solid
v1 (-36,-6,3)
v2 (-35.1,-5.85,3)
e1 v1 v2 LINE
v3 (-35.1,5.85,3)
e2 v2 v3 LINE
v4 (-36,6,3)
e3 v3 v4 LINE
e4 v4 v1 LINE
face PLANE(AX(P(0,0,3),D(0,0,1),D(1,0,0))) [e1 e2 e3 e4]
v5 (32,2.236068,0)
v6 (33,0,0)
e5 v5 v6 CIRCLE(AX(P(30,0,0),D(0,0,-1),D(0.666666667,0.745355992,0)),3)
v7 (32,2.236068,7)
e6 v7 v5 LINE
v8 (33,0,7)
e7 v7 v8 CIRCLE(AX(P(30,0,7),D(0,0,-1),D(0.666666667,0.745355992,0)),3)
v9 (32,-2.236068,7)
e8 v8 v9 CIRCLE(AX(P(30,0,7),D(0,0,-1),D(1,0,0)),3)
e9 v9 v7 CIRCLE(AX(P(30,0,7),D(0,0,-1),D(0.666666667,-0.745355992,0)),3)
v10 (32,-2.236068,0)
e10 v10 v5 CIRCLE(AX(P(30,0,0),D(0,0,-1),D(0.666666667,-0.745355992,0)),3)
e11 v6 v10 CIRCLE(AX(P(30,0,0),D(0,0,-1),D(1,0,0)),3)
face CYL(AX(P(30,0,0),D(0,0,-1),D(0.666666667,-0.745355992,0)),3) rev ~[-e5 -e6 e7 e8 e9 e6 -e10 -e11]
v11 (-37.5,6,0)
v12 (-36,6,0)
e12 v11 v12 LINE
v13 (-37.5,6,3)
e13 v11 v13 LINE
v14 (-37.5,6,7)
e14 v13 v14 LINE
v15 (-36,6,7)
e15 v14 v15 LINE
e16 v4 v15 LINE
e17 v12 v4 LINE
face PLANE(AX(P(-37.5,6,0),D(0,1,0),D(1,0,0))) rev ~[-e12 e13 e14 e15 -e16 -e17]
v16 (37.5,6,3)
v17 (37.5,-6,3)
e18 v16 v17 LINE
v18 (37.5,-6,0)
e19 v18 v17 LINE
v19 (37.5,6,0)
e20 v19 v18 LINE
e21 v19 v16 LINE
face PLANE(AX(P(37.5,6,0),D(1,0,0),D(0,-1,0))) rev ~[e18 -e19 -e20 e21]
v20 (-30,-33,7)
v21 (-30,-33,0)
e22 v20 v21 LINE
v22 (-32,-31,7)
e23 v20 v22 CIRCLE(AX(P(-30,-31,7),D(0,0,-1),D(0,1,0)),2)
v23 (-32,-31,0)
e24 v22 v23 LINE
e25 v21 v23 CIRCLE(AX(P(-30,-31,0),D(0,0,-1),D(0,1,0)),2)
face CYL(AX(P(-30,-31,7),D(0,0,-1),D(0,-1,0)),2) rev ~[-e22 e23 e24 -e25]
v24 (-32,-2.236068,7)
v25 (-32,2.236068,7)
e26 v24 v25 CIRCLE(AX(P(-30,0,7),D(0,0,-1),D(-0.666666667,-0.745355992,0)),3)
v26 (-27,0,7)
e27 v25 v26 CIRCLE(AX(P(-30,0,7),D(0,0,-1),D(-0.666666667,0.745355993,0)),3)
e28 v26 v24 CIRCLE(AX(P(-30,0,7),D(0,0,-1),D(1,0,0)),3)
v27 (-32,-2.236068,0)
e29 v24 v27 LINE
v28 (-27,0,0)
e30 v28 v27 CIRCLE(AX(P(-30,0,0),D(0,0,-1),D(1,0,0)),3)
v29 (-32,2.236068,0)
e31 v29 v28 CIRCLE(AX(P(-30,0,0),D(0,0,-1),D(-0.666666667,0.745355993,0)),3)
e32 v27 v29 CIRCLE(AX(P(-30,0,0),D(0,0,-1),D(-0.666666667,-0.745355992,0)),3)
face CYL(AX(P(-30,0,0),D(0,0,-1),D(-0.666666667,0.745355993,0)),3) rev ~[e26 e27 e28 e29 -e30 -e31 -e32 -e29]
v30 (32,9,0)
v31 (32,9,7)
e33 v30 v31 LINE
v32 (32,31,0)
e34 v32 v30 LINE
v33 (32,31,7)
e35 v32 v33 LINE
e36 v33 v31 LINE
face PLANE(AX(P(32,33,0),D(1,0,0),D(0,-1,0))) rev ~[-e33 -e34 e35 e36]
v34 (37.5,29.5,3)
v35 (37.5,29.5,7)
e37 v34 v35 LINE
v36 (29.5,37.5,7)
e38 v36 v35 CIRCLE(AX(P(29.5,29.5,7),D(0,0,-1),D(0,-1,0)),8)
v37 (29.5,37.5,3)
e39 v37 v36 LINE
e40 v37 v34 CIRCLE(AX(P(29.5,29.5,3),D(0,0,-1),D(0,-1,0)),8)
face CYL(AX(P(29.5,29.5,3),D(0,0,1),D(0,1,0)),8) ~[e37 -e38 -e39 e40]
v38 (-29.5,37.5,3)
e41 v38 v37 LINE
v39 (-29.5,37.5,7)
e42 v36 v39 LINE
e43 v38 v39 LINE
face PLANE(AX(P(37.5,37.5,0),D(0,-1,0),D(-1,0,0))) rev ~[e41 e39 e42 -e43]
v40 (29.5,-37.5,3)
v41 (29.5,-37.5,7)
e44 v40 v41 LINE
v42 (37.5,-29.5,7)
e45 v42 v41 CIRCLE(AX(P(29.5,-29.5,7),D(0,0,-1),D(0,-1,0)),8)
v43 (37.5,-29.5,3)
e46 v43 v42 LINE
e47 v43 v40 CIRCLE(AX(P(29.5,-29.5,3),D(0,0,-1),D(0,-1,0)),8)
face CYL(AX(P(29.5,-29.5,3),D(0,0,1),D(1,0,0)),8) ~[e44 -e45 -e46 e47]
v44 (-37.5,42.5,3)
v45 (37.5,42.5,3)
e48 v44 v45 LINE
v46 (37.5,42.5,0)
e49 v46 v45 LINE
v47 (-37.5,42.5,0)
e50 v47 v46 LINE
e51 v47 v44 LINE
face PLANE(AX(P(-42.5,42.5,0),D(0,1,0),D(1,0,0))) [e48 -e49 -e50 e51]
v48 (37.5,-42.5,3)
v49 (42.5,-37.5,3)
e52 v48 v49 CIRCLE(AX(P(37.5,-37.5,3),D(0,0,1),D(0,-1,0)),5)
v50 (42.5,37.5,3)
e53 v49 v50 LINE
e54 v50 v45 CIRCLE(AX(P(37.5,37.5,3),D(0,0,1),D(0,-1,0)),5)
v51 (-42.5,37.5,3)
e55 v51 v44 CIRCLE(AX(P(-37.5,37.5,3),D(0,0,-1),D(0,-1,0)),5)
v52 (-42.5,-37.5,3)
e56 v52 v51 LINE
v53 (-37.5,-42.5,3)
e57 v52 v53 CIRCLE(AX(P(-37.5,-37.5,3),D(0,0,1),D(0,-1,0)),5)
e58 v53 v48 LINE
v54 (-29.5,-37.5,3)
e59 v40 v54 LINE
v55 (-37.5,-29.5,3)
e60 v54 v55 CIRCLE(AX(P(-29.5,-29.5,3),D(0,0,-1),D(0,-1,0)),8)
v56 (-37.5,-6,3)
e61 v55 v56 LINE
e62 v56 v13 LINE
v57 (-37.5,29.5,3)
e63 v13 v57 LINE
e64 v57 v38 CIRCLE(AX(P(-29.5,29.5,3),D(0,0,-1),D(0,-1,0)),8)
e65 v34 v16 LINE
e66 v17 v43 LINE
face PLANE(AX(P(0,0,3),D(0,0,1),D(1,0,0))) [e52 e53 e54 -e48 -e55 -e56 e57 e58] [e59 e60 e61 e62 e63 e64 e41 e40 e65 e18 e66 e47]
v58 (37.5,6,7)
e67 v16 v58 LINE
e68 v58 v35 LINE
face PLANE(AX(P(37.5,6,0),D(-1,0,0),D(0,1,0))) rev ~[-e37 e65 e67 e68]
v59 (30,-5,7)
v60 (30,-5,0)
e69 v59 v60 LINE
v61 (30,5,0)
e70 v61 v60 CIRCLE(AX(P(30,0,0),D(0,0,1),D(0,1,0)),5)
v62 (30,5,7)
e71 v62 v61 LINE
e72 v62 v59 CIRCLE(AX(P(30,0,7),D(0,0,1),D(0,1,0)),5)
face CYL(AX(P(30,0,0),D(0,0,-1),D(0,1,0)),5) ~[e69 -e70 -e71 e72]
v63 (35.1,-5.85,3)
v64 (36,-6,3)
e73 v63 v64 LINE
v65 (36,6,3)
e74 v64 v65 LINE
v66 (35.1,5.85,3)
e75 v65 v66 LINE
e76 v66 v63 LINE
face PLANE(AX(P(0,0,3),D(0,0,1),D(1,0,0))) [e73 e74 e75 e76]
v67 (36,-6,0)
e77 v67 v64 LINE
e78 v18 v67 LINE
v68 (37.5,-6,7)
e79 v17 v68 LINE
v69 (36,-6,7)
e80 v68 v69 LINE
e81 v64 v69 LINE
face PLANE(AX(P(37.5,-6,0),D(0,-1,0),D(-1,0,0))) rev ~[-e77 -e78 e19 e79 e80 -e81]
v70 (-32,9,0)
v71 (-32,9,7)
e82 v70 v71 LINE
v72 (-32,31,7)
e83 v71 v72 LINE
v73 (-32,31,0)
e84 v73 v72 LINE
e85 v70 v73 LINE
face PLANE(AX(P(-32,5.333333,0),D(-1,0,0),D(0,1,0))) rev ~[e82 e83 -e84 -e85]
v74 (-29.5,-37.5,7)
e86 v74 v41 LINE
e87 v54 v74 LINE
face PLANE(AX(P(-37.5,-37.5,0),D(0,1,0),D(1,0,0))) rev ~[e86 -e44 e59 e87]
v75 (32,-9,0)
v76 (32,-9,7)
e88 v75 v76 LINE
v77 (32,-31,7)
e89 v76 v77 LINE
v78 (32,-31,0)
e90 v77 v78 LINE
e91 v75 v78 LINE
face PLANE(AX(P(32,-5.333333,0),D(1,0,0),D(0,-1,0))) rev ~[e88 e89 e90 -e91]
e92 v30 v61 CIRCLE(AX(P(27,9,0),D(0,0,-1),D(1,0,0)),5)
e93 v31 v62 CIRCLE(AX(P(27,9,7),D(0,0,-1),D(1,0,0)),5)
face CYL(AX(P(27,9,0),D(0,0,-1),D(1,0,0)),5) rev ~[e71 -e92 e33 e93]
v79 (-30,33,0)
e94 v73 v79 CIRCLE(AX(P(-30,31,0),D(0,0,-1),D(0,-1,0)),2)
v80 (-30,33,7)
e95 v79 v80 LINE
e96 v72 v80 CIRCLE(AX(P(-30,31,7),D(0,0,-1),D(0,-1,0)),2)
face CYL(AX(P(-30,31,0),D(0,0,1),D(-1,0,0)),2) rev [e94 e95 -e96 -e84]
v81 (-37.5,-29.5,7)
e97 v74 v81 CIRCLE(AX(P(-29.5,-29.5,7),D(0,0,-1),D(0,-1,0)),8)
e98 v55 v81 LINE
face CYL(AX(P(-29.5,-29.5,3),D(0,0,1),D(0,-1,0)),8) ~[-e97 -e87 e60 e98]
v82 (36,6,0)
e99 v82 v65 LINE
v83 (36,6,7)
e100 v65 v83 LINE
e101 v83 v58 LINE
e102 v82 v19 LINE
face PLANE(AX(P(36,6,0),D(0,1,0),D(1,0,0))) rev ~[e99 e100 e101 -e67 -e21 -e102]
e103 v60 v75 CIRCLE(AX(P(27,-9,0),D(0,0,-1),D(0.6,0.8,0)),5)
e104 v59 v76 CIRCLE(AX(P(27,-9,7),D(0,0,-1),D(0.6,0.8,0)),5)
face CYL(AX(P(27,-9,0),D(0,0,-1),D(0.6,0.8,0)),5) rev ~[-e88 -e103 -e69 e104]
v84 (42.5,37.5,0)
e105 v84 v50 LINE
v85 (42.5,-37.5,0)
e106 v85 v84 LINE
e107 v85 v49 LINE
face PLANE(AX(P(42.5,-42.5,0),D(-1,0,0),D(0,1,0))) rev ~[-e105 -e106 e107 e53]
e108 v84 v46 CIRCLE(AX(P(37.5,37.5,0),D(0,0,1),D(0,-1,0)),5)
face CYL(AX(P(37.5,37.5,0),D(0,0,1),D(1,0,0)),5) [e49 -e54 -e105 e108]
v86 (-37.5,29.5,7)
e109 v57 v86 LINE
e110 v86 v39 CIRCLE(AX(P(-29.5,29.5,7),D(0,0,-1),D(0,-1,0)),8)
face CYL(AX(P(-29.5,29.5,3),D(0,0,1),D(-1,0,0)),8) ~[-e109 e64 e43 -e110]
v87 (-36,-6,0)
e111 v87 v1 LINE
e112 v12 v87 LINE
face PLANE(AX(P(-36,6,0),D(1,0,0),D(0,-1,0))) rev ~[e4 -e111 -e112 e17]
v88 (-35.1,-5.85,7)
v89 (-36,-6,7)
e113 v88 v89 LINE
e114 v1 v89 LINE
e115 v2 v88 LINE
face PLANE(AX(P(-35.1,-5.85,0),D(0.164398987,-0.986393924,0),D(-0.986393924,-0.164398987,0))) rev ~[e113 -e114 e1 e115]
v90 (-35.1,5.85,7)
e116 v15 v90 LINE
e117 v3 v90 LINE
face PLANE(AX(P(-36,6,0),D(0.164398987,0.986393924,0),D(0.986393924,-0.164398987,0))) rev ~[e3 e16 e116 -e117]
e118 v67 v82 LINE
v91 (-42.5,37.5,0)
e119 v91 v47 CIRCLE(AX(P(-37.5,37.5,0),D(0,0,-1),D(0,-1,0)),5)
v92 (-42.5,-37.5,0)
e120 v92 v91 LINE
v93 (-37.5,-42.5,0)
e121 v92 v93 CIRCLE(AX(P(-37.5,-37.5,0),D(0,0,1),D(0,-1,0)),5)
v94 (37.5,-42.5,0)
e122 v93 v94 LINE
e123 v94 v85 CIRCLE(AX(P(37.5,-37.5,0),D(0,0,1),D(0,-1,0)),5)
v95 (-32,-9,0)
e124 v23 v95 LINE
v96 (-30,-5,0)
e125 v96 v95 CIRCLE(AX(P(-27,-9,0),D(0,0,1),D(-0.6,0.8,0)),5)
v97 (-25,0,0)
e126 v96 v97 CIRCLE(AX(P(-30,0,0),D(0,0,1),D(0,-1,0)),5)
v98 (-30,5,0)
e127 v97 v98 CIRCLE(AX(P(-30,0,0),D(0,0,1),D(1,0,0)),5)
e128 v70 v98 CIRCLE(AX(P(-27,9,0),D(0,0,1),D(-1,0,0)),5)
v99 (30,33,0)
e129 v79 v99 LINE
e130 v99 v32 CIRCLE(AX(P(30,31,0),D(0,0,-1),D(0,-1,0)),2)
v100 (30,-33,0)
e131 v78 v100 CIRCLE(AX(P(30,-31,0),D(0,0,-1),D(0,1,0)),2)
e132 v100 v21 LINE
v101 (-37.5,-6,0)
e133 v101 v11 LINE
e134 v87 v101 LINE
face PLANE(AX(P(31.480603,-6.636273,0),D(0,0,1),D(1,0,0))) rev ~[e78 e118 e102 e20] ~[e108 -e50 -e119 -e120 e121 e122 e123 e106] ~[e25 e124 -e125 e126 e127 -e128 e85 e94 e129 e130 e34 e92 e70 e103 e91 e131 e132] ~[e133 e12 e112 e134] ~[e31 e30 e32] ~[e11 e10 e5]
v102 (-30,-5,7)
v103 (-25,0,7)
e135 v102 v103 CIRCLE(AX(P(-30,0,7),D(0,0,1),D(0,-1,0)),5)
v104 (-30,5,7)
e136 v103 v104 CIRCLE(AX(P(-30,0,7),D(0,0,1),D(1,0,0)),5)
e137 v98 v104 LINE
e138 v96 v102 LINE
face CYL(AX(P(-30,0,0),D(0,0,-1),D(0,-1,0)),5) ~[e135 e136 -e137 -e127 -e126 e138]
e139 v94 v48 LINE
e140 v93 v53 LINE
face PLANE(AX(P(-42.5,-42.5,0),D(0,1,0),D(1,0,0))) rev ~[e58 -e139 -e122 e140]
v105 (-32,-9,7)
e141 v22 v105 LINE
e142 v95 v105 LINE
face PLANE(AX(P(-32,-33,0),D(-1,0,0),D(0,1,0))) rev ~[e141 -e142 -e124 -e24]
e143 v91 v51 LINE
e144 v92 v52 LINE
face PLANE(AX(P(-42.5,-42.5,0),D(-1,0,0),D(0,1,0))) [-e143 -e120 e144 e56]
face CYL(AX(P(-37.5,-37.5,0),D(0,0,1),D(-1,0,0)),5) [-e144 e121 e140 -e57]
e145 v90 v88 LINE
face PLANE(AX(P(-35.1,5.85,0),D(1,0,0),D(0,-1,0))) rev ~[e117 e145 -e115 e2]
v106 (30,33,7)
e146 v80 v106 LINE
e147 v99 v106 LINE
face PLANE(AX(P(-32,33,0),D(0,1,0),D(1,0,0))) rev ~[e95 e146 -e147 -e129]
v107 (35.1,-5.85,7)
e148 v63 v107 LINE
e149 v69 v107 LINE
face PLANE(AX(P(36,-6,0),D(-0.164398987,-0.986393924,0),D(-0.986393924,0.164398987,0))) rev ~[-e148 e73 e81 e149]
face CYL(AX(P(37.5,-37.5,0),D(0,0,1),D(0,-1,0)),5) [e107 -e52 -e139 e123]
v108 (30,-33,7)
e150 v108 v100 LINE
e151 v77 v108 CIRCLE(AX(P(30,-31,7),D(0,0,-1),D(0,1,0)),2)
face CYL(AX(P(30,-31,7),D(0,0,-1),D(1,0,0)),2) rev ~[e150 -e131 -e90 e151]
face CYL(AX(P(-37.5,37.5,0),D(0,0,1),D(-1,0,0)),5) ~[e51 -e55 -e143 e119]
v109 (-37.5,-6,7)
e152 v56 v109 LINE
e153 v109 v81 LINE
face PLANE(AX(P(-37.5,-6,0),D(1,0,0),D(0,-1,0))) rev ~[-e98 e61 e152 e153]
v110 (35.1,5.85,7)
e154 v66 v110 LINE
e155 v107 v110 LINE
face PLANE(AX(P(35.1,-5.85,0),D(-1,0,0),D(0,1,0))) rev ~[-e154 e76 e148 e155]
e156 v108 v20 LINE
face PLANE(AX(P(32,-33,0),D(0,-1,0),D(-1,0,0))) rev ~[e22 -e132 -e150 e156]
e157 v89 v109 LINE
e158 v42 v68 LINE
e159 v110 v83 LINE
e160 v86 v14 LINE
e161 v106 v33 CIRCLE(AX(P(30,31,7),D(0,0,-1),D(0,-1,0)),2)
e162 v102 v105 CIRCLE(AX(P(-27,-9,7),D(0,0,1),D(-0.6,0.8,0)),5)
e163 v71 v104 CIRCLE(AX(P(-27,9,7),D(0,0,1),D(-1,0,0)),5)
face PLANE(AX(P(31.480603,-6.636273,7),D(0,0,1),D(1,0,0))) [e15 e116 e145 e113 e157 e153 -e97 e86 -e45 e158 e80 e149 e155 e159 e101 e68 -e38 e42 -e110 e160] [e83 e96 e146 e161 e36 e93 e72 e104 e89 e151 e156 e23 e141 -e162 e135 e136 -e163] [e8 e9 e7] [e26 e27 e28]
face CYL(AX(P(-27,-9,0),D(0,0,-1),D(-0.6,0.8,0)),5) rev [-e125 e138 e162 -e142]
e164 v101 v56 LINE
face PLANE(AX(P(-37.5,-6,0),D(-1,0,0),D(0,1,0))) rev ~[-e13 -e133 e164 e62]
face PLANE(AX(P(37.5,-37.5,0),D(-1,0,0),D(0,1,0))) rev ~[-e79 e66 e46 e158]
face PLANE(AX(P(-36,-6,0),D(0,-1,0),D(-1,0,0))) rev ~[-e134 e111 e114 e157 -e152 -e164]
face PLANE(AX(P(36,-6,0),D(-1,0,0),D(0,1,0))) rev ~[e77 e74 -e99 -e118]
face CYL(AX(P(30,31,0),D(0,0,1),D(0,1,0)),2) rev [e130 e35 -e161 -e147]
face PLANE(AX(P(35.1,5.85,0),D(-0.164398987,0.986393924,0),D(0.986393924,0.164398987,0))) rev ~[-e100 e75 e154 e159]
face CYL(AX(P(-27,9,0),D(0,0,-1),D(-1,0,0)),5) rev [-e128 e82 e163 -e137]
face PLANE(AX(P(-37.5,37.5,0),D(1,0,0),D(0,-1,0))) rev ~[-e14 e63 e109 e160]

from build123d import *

# Parameters (mm, degrees)
F0_W        = 85
F0_H        = 85
F1_DEPTH    = 3
F2_R        = 5
F3_DEPTH    = 7
F4_R        = 8
F5_R        = 2
F6_T1_DEPTH = 7


# Not quite as in the source:
# - a fillet or chamfer that OpenCascade refuses, or shapes differently, is made with other operations: its cross-section is extruded or revolved along the edge and cut away or added


with BuildPart() as f1:
    # F0 (on Top) → F1 (new body)
    with BuildSketch(Plane.XY):
        Rectangle(F0_W, F0_H)
        Polygon((-37.5, -6), (-37.5, 6), (-37.5, 37.5), (37.5, 37.5), (37.5, 6), (37.5, -6), (37.5, -37.5), (-37.5, -37.5), align=None, mode=Mode.SUBTRACT)
        Polygon((-35.1, -35.1), (-35.1, -5.85), (-36, -6), (-37.5, -6), (-37.5, -37.5), (37.5, -37.5), (37.5, -6), (36, -6), (35.1, -5.85), (35.1, -35.1), align=None)
        Polygon((-36, 6), (-35.1, 5.85), (-35.1, 35.1), (35.1, 35.1), (35.1, 5.85), (36, 6), (37.5, 6), (37.5, 37.5), (-37.5, 37.5), (-37.5, 6), align=None)
        Polygon((-32, 5.3333333333), (-32, 33), (32, 33), (32, 5.3333333333), (35.1, 5.85), (35.1, 35.1), (-35.1, 35.1), (-35.1, 5.85), align=None)
        with BuildLine():
            Line((-32, 4.582575695), (-32, 5.3333333333))
            Line((-32, 5.3333333333), (-35.1, 5.85))
            Line((-35.1, 5.85), (-35.1, -5.85))
            Line((-35.1, -5.85), (-32, -5.3333333333))
            Line((-32, -5.3333333333), (-32, -4.582575695))
            ThreePointArc((-32, -4.582575695), (-35, 0), (-32, 4.582575695))
        make_face()
        Polygon((-35.1, -5.85), (-35.1, 5.85), (-36, 6), (-36, -6), align=None)
        with BuildLine():
            ThreePointArc((-30, 5), (-31.0215482184, 4.8945315647), (-32, 4.582575695))
            Line((-32, 4.582575695), (-32, 2.2360679775))
            ThreePointArc((-32, 2.2360679775), (-28.7752551286, 2.7386127875), (-27, 0))
            ThreePointArc((-27, 0), (-28.7752551286, -2.7386127875), (-32, -2.2360679775))
            Line((-32, -2.2360679775), (-32, -4.582575695))
            ThreePointArc((-32, -4.582575695), (-31.0215482184, -4.8945315647), (-30, -5))
            ThreePointArc((-30, -5), (-26.4644660941, -3.5355339059), (-25, 0))
            ThreePointArc((-25, 0), (-26.4644660941, 3.5355339059), (-30, 5))
        make_face()
        with BuildLine():
            Line((-30, 5), (-32, 5.3333333333))
            Line((-32, 5.3333333333), (-32, 4.582575695))
            ThreePointArc((-32, 4.582575695), (-31.0215482184, 4.8945315647), (-30, 5))
        make_face()
        with BuildLine():
            ThreePointArc((-30, -5), (-31.0215482184, -4.8945315647), (-32, -4.582575695))
            Line((-32, -4.582575695), (-32, -5.3333333333))
            Line((-32, -5.3333333333), (-30, -5))
        make_face()
        Polygon((-32, -5.3333333333), (-35.1, -5.85), (-35.1, -35.1), (35.1, -35.1), (35.1, -5.85), (32, -5.3333333333), (32, -33), (-32, -33), align=None)
        with BuildLine():
            Line((35.1, 5.85), (32, 5.3333333333))
            Line((32, 5.3333333333), (32, 4.582575695))
            ThreePointArc((32, 4.582575695), (34.1833001327, 2.7386127875), (35, 0))
            ThreePointArc((35, 0), (34.1833001327, -2.7386127875), (32, -4.582575695))
            Line((32, -4.582575695), (32, -5.3333333333))
            Line((32, -5.3333333333), (35.1, -5.85))
            Line((35.1, -5.85), (35.1, 5.85))
        make_face()
        with BuildLine():
            Line((32, 4.582575695), (32, 5.3333333333))
            Line((32, 5.3333333333), (30, 5))
            ThreePointArc((30, 5), (31.0215482184, 4.8945315647), (32, 4.582575695))
        make_face()
        with BuildLine():
            ThreePointArc((32, -4.582575695), (31.0215482184, -4.8945315647), (30, -5))
            Line((30, -5), (32, -5.3333333333))
            Line((32, -5.3333333333), (32, -4.582575695))
        make_face()
        with BuildLine():
            Line((32, 2.2360679775), (32, 4.582575695))
            ThreePointArc((32, 4.582575695), (31.0215482184, 4.8945315647), (30, 5))
            ThreePointArc((30, 5), (25, 0), (30, -5))
            ThreePointArc((30, -5), (31.0215482184, -4.8945315647), (32, -4.582575695))
            Line((32, -4.582575695), (32, -2.2360679775))
            ThreePointArc((32, -2.2360679775), (27, 0), (32, 2.2360679775))
        make_face()
        with BuildLine():
            ThreePointArc((35, 0), (34.1833001327, 2.7386127875), (32, 4.582575695))
            Line((32, 4.582575695), (32, 2.2360679775))
            ThreePointArc((32, 2.2360679775), (32.7386127875, 1.2247448714), (33, 0))
            ThreePointArc((33, 0), (32.7386127875, -1.2247448714), (32, -2.2360679775))
            Line((32, -2.2360679775), (32, -4.582575695))
            ThreePointArc((32, -4.582575695), (34.1833001327, -2.7386127875), (35, 0))
        make_face()
        with BuildLine():
            Line((-32, 2.2360679775), (-32, 4.582575695))
            ThreePointArc((-32, 4.582575695), (-35, 0), (-32, -4.582575695))
            Line((-32, -4.582575695), (-32, -2.2360679775))
            ThreePointArc((-32, -2.2360679775), (-33, 0), (-32, 2.2360679775))
        make_face()
        Polygon((36, 6), (35.1, 5.85), (35.1, -5.85), (36, -6), align=None)
    extrude(amount=F1_DEPTH)

    # F2
    f2_edges = [f1.edges().sort_by_distance(p)[0] for p in [
        (-42.5, 42.5, 1.5),
        (-42.5, -42.5, 1.5),
        (42.5, -42.5, 1.5),
        (42.5, 42.5, 1.5),
    ]]
    fillet(f2_edges, radius=F2_R)

    # F0 (on Top) → F3 (join)
    with BuildSketch(Plane.XY):
        with BuildLine():
            Line((-32, 4.582575695), (-32, 5.3333333333))
            Line((-32, 5.3333333333), (-35.1, 5.85))
            Line((-35.1, 5.85), (-35.1, -5.85))
            Line((-35.1, -5.85), (-32, -5.3333333333))
            Line((-32, -5.3333333333), (-32, -4.582575695))
            ThreePointArc((-32, -4.582575695), (-35, 0), (-32, 4.582575695))
        make_face()
        with BuildLine():
            Line((-30, 5), (-32, 5.3333333333))
            Line((-32, 5.3333333333), (-32, 4.582575695))
            ThreePointArc((-32, 4.582575695), (-31.0215482184, 4.8945315647), (-30, 5))
        make_face()
        with BuildLine():
            ThreePointArc((-30, 5), (-31.0215482184, 4.8945315647), (-32, 4.582575695))
            Line((-32, 4.582575695), (-32, 2.2360679775))
            ThreePointArc((-32, 2.2360679775), (-28.7752551286, 2.7386127875), (-27, 0))
            ThreePointArc((-27, 0), (-28.7752551286, -2.7386127875), (-32, -2.2360679775))
            Line((-32, -2.2360679775), (-32, -4.582575695))
            ThreePointArc((-32, -4.582575695), (-31.0215482184, -4.8945315647), (-30, -5))
            ThreePointArc((-30, -5), (-26.4644660941, -3.5355339059), (-25, 0))
            ThreePointArc((-25, 0), (-26.4644660941, 3.5355339059), (-30, 5))
        make_face()
        with BuildLine():
            Line((-32, 2.2360679775), (-32, 4.582575695))
            ThreePointArc((-32, 4.582575695), (-35, 0), (-32, -4.582575695))
            Line((-32, -4.582575695), (-32, -2.2360679775))
            ThreePointArc((-32, -2.2360679775), (-33, 0), (-32, 2.2360679775))
        make_face()
        with BuildLine():
            ThreePointArc((-30, -5), (-31.0215482184, -4.8945315647), (-32, -4.582575695))
            Line((-32, -4.582575695), (-32, -5.3333333333))
            Line((-32, -5.3333333333), (-30, -5))
        make_face()
        Polygon((-32, -5.3333333333), (-35.1, -5.85), (-35.1, -35.1), (35.1, -35.1), (35.1, -5.85), (32, -5.3333333333), (32, -33), (-32, -33), align=None)
        Polygon((-35.1, -35.1), (-35.1, -5.85), (-36, -6), (-37.5, -6), (-37.5, -37.5), (37.5, -37.5), (37.5, -6), (36, -6), (35.1, -5.85), (35.1, -35.1), align=None)
        Polygon((-36, 6), (-35.1, 5.85), (-35.1, 35.1), (35.1, 35.1), (35.1, 5.85), (36, 6), (37.5, 6), (37.5, 37.5), (-37.5, 37.5), (-37.5, 6), align=None)
        Polygon((-32, 5.3333333333), (-32, 33), (32, 33), (32, 5.3333333333), (35.1, 5.85), (35.1, 35.1), (-35.1, 35.1), (-35.1, 5.85), align=None)
        with BuildLine():
            ThreePointArc((32, -4.582575695), (31.0215482184, -4.8945315647), (30, -5))
            Line((30, -5), (32, -5.3333333333))
            Line((32, -5.3333333333), (32, -4.582575695))
        make_face()
        with BuildLine():
            Line((32, 2.2360679775), (32, 4.582575695))
            ThreePointArc((32, 4.582575695), (31.0215482184, 4.8945315647), (30, 5))
            ThreePointArc((30, 5), (25, 0), (30, -5))
            ThreePointArc((30, -5), (31.0215482184, -4.8945315647), (32, -4.582575695))
            Line((32, -4.582575695), (32, -2.2360679775))
            ThreePointArc((32, -2.2360679775), (27, 0), (32, 2.2360679775))
        make_face()
        with BuildLine():
            Line((32, 4.582575695), (32, 5.3333333333))
            Line((32, 5.3333333333), (30, 5))
            ThreePointArc((30, 5), (31.0215482184, 4.8945315647), (32, 4.582575695))
        make_face()
        with BuildLine():
            ThreePointArc((35, 0), (34.1833001327, 2.7386127875), (32, 4.582575695))
            Line((32, 4.582575695), (32, 2.2360679775))
            ThreePointArc((32, 2.2360679775), (32.7386127875, 1.2247448714), (33, 0))
            ThreePointArc((33, 0), (32.7386127875, -1.2247448714), (32, -2.2360679775))
            Line((32, -2.2360679775), (32, -4.582575695))
            ThreePointArc((32, -4.582575695), (34.1833001327, -2.7386127875), (35, 0))
        make_face()
        with BuildLine():
            Line((35.1, 5.85), (32, 5.3333333333))
            Line((32, 5.3333333333), (32, 4.582575695))
            ThreePointArc((32, 4.582575695), (34.1833001327, 2.7386127875), (35, 0))
            ThreePointArc((35, 0), (34.1833001327, -2.7386127875), (32, -4.582575695))
            Line((32, -4.582575695), (32, -5.3333333333))
            Line((32, -5.3333333333), (35.1, -5.85))
            Line((35.1, -5.85), (35.1, 5.85))
        make_face()
    extrude(amount=F3_DEPTH)

    # F4
    f4_edges = [f1.edges().sort_by_distance(p)[0] for p in [
        (-37.5, -37.5, 5),
        (37.5, -37.5, 5),
        (37.5, 37.5, 5),
        (-37.5, 37.5, 5),
    ]]
    fillet(f4_edges, radius=F4_R)

    # F5
    f5_edges = [f1.edges().sort_by_distance(p)[0] for p in [
        (32, -33, 3.5),
        (-32, -33, 3.5),
        (-32, 33, 3.5),
        (32, 33, 3.5),
    ]]
    fillet(f5_edges, radius=F5_R)

    # F6: fillet of radius 5 on 4 edges, made by hand

    # F6_s2 → F6_t1 (join)
    with BuildSketch(Plane.XY):
        with BuildLine():
            ThreePointArc((30, -5), (31.472135955, -6.7639320225), (32, -9))
            Line((32, -9), (32, -5.3333333333))
            Line((32, -5.3333333333), (30, -5))
        make_face()
        with BuildLine():
            ThreePointArc((32, 9), (31.472135955, 6.7639320225), (30, 5))
            Line((30, 5), (32, 5.3333333333))
            Line((32, 5.3333333333), (32, 9))
        make_face()
        with BuildLine():
            ThreePointArc((-32, 9), (-31.472135955, 6.7639320225), (-30, 5))
            Line((-30, 5), (-32, 5.3333333333))
            Line((-32, 5.3333333333), (-32, 9))
        make_face()
        with BuildLine():
            ThreePointArc((-30, -5), (-31.472135955, -6.7639320225), (-32, -9))
            Line((-32, -9), (-32, -5.3333333333))
            Line((-32, -5.3333333333), (-30, -5))
        make_face()
    extrude(amount=F6_T1_DEPTH)


solid = f1.part
